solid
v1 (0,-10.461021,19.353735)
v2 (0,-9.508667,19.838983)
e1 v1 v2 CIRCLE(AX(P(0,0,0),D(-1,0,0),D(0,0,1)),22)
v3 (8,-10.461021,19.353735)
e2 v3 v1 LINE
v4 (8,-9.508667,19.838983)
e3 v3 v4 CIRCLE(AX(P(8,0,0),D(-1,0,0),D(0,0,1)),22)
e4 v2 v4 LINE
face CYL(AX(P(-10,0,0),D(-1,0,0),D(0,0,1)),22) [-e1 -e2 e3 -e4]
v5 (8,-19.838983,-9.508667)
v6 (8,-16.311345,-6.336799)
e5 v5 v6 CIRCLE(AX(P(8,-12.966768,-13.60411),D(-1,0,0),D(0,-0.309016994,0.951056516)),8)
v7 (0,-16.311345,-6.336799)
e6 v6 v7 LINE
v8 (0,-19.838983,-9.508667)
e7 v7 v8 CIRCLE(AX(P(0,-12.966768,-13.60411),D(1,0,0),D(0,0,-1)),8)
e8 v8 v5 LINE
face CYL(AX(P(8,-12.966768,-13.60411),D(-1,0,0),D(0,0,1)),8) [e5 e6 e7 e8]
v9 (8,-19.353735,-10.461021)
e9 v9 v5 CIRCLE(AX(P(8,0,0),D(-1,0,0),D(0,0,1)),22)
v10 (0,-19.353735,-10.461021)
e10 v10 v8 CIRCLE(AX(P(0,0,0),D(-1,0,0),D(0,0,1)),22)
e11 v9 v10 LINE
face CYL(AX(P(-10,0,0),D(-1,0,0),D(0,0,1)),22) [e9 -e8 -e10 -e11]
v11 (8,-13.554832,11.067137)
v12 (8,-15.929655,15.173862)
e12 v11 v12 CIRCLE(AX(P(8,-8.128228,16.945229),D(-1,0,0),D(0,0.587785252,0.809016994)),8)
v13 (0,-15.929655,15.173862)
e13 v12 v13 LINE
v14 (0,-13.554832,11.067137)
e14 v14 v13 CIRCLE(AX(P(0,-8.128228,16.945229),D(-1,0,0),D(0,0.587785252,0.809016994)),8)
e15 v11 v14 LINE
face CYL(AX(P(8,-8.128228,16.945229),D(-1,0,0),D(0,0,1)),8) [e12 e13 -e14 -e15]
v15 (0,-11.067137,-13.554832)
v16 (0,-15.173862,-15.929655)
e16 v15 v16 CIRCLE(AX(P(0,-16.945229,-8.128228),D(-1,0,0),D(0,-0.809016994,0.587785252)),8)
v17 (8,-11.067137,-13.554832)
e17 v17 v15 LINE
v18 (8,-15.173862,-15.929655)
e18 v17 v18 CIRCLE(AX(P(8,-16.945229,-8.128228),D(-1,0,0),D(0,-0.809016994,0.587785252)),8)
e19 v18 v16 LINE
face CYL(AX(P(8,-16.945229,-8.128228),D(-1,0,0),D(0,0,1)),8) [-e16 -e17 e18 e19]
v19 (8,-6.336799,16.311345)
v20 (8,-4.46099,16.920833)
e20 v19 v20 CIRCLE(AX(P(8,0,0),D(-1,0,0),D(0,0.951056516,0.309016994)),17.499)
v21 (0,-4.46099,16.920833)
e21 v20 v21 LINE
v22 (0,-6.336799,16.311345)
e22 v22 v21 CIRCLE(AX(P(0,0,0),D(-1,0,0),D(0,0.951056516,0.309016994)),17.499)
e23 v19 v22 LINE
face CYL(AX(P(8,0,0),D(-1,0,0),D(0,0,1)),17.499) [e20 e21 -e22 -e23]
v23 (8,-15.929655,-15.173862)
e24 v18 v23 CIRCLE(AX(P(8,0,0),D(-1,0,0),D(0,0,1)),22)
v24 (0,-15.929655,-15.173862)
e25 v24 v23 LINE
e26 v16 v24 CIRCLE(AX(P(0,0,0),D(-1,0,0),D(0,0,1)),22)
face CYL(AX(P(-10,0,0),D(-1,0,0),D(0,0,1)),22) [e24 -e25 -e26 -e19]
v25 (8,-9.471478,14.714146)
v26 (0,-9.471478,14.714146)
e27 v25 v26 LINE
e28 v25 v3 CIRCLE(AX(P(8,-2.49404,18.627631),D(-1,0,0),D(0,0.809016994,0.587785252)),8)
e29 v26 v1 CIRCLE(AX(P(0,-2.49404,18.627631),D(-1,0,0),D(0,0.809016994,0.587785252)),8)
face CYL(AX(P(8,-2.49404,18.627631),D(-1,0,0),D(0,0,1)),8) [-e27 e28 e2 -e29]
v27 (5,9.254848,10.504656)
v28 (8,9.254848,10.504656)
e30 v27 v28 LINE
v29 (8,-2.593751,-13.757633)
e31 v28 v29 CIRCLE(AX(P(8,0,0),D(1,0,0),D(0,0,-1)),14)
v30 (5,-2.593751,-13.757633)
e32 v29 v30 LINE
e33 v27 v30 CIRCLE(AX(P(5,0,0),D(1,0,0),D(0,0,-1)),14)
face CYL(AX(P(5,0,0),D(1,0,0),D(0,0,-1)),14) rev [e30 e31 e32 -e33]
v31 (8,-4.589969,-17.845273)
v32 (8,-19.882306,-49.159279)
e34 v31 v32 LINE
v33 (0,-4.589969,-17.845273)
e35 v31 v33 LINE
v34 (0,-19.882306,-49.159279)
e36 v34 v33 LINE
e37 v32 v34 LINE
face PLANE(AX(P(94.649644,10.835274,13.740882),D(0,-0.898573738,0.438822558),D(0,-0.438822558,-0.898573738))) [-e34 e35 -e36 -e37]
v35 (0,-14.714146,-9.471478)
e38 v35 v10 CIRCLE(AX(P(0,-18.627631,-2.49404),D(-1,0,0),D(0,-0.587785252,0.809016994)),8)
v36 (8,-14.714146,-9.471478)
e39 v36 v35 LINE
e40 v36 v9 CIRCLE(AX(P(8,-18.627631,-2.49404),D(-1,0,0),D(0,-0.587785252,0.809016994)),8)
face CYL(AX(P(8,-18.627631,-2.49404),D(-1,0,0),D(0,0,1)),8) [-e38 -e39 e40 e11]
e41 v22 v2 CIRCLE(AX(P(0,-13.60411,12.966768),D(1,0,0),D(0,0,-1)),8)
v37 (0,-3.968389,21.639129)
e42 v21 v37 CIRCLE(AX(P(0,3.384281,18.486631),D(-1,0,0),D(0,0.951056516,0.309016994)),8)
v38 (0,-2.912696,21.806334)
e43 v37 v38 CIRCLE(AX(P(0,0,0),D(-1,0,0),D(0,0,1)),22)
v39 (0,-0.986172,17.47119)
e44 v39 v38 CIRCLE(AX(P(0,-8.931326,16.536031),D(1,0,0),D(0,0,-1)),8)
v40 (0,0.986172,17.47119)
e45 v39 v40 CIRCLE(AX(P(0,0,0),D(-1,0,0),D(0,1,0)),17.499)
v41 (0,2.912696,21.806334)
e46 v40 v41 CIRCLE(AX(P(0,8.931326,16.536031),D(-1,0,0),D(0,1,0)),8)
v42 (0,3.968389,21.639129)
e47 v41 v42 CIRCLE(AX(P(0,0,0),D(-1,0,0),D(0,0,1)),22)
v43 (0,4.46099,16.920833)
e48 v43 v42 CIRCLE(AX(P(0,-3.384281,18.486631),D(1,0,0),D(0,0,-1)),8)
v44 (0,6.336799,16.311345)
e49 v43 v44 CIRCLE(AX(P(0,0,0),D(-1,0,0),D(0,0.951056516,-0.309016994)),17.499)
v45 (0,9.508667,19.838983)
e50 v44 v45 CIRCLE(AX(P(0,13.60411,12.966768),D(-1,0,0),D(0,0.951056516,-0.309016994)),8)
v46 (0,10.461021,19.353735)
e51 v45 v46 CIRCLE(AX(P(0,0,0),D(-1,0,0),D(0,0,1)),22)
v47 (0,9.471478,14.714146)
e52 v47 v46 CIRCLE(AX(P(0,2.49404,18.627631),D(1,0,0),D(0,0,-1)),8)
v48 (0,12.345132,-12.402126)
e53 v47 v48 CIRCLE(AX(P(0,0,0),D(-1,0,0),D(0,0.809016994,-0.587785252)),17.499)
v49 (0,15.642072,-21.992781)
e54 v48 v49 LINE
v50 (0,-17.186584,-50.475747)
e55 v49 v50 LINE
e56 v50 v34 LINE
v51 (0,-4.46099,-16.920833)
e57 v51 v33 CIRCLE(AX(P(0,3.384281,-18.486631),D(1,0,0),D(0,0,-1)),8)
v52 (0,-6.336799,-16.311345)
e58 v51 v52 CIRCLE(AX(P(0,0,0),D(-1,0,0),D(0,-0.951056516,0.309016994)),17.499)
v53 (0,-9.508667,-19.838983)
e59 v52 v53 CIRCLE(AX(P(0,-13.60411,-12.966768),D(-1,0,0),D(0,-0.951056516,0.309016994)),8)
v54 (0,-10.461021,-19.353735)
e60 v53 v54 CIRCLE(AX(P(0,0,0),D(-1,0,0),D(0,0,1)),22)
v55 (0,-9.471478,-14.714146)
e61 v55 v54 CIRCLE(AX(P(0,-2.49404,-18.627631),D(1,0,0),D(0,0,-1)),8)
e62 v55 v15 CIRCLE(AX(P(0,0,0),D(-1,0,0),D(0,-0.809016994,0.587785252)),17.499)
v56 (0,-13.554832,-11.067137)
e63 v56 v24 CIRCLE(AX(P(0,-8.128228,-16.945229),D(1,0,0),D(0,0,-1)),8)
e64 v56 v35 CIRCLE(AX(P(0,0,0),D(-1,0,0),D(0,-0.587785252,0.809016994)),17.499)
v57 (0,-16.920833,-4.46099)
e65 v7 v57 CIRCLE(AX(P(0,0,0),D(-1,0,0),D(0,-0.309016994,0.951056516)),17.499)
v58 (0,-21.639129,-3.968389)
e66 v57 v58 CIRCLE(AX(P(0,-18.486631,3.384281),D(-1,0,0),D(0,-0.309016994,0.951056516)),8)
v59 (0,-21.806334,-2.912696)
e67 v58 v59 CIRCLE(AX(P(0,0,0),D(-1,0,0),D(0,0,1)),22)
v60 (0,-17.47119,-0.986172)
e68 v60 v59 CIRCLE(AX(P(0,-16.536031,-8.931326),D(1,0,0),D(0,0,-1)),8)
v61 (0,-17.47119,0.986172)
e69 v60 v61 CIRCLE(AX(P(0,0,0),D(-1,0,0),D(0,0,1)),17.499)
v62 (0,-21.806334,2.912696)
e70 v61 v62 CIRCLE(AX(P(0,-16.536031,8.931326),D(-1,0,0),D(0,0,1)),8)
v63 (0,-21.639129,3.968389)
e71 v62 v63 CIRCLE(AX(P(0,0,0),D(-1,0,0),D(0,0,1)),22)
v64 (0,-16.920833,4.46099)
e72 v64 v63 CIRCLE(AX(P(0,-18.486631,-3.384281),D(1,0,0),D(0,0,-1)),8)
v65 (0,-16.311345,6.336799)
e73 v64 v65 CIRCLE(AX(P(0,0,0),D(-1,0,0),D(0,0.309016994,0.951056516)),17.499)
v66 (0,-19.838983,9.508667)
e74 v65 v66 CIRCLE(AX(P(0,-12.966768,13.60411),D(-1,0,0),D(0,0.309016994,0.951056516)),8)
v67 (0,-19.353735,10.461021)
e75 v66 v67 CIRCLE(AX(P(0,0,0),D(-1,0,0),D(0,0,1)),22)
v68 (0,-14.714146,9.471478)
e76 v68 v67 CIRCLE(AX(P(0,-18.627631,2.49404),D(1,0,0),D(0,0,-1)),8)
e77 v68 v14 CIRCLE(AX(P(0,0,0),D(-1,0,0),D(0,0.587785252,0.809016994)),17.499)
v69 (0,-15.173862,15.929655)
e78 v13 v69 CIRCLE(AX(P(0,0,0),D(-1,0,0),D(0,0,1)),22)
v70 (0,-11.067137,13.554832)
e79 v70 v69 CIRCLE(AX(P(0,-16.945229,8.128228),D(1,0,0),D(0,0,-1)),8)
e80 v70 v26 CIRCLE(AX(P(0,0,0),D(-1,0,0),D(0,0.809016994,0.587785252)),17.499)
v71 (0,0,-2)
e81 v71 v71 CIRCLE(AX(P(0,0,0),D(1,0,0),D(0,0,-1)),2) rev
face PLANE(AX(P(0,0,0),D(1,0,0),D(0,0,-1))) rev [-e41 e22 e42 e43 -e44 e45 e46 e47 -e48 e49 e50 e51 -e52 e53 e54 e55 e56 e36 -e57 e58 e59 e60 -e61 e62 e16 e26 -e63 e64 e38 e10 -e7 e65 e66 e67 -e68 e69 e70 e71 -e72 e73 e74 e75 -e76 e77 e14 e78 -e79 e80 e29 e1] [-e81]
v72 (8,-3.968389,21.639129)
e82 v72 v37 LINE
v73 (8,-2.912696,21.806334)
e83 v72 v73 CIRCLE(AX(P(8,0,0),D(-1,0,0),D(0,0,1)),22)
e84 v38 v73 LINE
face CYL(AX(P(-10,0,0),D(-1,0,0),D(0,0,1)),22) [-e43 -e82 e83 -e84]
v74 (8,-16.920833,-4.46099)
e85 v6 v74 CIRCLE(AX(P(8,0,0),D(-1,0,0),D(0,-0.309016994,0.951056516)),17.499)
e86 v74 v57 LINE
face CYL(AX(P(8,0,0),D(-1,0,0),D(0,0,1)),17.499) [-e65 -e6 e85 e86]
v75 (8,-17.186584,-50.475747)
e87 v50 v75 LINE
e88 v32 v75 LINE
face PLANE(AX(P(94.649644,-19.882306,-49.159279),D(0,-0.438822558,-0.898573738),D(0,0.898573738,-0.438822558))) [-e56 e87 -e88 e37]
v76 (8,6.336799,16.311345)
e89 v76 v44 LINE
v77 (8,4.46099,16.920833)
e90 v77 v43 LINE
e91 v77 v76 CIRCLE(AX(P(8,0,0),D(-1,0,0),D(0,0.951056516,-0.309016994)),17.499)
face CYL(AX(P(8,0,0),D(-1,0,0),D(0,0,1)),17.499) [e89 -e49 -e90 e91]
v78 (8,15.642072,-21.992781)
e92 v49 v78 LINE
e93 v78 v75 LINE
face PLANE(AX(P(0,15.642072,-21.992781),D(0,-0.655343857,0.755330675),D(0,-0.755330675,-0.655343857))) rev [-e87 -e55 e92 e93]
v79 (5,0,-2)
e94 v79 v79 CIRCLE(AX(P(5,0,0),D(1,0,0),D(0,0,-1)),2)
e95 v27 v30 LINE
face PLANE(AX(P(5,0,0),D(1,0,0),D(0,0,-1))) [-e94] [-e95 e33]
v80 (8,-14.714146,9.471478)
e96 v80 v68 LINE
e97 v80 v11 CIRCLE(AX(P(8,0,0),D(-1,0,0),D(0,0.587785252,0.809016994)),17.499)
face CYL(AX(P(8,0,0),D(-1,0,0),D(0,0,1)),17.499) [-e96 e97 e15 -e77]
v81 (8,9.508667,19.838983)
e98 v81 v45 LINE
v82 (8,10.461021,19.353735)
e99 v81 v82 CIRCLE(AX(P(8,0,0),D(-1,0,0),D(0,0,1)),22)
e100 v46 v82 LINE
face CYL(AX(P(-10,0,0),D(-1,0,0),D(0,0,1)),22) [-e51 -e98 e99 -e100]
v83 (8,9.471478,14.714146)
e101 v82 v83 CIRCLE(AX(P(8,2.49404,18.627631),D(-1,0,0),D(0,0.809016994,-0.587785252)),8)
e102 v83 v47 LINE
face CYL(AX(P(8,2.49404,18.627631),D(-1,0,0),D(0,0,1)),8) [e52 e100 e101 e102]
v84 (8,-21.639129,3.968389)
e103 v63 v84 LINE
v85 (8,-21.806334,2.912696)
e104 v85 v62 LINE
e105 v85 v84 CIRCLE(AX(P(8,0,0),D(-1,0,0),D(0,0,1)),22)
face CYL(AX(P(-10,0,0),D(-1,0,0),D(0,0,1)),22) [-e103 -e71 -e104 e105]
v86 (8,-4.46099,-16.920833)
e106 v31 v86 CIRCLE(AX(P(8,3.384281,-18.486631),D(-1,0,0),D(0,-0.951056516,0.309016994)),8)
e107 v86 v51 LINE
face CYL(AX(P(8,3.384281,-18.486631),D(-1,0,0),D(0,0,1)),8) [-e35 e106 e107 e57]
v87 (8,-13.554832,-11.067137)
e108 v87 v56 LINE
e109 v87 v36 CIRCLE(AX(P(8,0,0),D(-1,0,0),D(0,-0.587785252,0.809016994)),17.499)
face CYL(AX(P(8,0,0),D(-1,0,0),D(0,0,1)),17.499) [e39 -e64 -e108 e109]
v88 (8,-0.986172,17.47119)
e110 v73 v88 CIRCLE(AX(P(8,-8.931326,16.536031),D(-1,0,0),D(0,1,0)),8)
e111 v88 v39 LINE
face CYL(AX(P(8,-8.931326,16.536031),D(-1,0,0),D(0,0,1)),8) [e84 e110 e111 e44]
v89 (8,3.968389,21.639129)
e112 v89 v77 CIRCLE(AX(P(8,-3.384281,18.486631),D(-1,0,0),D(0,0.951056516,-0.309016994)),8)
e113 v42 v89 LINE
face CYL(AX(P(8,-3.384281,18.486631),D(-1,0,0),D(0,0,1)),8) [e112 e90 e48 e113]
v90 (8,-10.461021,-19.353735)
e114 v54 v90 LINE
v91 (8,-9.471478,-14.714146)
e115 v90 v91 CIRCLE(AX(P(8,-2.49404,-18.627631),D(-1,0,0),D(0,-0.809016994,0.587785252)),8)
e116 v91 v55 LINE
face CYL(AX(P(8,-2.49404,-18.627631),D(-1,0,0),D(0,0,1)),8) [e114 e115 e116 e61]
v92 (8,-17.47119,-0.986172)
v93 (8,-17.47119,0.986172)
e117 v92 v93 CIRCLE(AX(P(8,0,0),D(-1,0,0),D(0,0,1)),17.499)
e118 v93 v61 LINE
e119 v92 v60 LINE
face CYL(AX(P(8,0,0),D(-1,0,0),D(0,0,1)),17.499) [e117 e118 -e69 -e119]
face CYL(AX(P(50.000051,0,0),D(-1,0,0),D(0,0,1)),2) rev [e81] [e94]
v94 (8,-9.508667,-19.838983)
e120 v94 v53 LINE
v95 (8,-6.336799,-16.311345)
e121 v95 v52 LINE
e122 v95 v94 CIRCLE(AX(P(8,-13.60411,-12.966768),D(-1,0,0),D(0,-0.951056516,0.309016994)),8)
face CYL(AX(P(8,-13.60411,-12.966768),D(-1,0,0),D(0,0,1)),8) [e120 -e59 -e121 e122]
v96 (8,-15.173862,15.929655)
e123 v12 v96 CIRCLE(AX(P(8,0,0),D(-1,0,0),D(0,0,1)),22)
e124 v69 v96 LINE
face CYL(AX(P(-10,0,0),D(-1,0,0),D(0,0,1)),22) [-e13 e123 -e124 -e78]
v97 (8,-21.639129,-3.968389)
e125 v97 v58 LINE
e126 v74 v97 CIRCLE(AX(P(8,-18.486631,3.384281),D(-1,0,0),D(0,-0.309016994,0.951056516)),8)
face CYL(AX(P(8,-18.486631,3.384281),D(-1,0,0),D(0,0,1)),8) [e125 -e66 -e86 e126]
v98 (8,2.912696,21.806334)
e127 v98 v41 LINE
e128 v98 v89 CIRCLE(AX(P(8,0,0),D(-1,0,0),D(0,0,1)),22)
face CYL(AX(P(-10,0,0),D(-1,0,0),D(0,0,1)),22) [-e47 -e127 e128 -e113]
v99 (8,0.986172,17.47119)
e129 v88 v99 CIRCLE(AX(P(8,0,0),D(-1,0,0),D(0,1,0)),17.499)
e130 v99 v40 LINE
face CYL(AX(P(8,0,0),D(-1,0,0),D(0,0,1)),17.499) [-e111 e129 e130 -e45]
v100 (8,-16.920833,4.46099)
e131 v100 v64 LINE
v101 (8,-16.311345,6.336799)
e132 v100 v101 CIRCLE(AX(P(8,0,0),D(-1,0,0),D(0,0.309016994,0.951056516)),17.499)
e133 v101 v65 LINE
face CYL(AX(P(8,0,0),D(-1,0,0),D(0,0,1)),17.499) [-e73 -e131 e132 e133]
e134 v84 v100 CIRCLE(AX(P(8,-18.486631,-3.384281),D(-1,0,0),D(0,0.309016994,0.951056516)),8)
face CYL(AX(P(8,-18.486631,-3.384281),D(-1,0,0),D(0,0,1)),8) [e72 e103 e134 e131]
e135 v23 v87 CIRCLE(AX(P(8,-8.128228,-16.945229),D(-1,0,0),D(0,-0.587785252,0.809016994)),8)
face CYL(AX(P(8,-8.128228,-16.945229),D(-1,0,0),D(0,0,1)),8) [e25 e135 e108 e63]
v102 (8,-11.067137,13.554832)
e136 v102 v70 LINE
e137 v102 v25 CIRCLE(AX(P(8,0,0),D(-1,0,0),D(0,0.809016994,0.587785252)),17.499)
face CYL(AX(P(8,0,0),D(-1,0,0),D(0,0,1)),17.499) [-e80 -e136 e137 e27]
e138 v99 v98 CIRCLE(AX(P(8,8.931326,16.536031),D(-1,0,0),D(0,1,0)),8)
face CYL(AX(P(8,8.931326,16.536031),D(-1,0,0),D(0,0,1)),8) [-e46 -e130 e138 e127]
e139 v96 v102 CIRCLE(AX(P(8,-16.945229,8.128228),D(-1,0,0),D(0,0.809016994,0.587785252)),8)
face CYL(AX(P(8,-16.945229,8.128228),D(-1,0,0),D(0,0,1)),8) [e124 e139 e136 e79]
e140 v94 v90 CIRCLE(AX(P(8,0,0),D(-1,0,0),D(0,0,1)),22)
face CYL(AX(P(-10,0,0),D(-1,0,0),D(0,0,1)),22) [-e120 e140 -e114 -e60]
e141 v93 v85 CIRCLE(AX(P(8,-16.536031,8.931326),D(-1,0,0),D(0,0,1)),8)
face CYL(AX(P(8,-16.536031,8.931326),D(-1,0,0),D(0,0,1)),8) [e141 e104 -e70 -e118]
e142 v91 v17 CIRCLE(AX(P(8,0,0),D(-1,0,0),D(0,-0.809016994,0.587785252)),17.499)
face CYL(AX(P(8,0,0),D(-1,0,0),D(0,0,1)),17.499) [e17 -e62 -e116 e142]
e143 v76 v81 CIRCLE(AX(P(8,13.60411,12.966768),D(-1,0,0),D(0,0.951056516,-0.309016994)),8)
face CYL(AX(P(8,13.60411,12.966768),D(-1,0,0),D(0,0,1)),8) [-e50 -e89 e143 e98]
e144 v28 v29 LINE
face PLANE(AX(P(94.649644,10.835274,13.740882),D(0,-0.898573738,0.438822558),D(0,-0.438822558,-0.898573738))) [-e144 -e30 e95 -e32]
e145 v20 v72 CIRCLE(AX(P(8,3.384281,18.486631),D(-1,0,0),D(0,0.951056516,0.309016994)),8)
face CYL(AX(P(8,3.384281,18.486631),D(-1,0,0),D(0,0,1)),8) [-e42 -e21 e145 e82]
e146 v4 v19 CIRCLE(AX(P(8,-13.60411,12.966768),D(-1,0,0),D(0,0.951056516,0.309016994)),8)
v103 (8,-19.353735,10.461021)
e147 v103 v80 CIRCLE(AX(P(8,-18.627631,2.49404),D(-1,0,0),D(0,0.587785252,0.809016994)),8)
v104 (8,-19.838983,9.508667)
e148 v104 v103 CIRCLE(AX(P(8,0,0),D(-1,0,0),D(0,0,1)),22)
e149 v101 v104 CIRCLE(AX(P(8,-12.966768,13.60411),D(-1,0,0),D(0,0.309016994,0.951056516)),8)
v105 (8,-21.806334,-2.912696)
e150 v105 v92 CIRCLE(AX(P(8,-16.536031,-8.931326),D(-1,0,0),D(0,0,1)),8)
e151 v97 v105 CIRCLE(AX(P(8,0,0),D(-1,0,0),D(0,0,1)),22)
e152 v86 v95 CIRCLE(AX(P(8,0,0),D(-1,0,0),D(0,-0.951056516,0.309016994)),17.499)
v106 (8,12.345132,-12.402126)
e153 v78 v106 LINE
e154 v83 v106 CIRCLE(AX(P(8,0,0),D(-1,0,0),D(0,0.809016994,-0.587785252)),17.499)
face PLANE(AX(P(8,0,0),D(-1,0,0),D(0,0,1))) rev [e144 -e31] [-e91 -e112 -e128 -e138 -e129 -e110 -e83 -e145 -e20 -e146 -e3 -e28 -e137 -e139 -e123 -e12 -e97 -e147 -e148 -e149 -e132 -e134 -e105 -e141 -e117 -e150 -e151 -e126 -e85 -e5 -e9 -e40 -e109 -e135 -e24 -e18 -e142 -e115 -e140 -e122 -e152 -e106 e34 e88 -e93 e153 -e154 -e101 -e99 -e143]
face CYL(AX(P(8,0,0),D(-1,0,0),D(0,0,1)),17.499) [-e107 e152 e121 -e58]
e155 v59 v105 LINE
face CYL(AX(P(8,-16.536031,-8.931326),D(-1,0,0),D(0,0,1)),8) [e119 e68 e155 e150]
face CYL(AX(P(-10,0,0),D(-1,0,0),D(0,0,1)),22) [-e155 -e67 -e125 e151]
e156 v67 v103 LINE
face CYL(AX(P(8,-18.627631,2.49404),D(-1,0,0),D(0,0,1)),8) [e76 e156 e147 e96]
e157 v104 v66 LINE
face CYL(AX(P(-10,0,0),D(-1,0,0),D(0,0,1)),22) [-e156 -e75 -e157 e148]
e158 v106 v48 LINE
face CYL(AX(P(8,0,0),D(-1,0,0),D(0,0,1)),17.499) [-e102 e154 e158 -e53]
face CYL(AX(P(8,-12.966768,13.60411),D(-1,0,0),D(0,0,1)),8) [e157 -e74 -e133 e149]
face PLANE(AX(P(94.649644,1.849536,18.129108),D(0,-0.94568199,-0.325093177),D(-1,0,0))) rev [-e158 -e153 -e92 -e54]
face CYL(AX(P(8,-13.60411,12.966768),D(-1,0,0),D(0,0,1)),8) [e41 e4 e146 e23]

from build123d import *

# Parameters (mm, degrees)
BASPROSKE_W         = 8
BASPROSKE_H         = 22
TOOTHCUT_DEPTH      = 33.124756808
TEETHCUTS_COUNT     = 20
TEETHCUTS_ANGLE     = 342
BORSKE_R            = 2
BORE_DEPTH          = 8
SKETCH1_R           = 14
CUT_EXTRUDE1_DEPTH  = 3
CUT_EXTRUDE2_DEPTH  = 32.859573128
BOSS_EXTRUDE1_DEPTH = 8
CUT_EXTRUDE3_DEPTH  = 66.194920127
CHAMFER1_SIZE       = 30


with BuildPart() as part:
    # BasProSke → Base-Revolve (revolve)
    with BuildSketch(Plane(origin=(0, 0, 0), x_dir=(1, 0, 0), z_dir=(0, 1, 0)), mode=Mode.PRIVATE) as base_revolve_sk:
        with Locations((4, 11)):
            Rectangle(BASPROSKE_W, BASPROSKE_H)
    revolve(base_revolve_sk.sketch.rotate(Axis((-10, 0, 0), (1, 0, 0)), 180), axis=Axis((-10, 0, 0), (1, 0, 0)))

    # TooCutSke → ToothCut (cut, through all)
    with BuildSketch(Plane(origin=(0, 0, 0), x_dir=(0, 0, -1), z_dir=(1, 0, 0))):
        with BuildLine():
            ThreePointArc((0.986171591, 17.471189616), (0, 17.499), (-0.986171591, 17.471189616))
            ThreePointArc((-0.986171591, 17.471189616), (-1.626916196, 19.798789858), (-2.932850173, 21.829260982))
            ThreePointArc((-2.932850173, 21.829260982), (0, 22.0254), (2.932850173, 21.829260982))
            ThreePointArc((2.932850173, 21.829260982), (1.626916196, 19.798789858), (0.986171591, 17.471189616))
        make_face()
    toothcut = extrude(amount=TOOTHCUT_DEPTH, mode=Mode.SUBTRACT)

    # TeethCuts: ToothCut ×20 about axis
    teethcuts_axis = Axis((-10, 0, 0), (1, 0, 0))
    for i in range(1, TEETHCUTS_COUNT):
        add(toothcut.rotate(teethcuts_axis, i * TEETHCUTS_ANGLE / (TEETHCUTS_COUNT - 1)), mode=Mode.SUBTRACT)

    # BorSke → Bore (cut, symmetric)
    with BuildSketch(Plane(origin=(0, 0, 0), x_dir=(0, 0, -1), z_dir=(1, 0, 0))):
        with Locations(Location((0, 0, 0), (0, 0, 180))):
            Circle(BORSKE_R)
    extrude(amount=BORE_DEPTH, both=True, mode=Mode.SUBTRACT)

    # Sketch1 → Cut-Extrude1 (cut)
    with BuildSketch(Plane(origin=(8, 0, 0), x_dir=(0, 0, -1), z_dir=(1, 0, 0))):
        Circle(SKETCH1_R)
    extrude(amount=-CUT_EXTRUDE1_DEPTH, mode=Mode.SUBTRACT)

    # Sketch2 → Cut-Extrude2 (cut, through all)
    with BuildSketch(Plane.ZY):
        Polygon((-21.592193025, -6.419793995), (20.580067201, 14.175220465), (12.820897061, 30.063616315), (-23.756341743, 14.175220465), (-26.106914947, 1.214231969), align=None)
    extrude(amount=-CUT_EXTRUDE2_DEPTH, mode=Mode.SUBTRACT)

    # Sketch3 → Boss-Extrude1 (add)
    with BuildSketch(Plane.ZY):
        Polygon((13.740882365, 10.835273546), (-49.159279282, -19.882305538), (-57.935730449, -1.910830782), (4.964431198, 28.806748303), align=None)
    extrude(amount=-BOSS_EXTRUDE1_DEPTH)

    # Sketch6 → Cut-Extrude3 (cut, through all)
    with BuildSketch(Plane(origin=(8, 0, 0), x_dir=(0, 0, -1), z_dir=(1, 0, 0))):
        Polygon((50.475746957, -17.186584325), (57.935730449, -1.910830782), (21.992780936, 15.642071552), align=None)
    extrude(amount=-CUT_EXTRUDE3_DEPTH, mode=Mode.SUBTRACT)

    # Chamfer1
    # the kernel refuses this chamfer: 30 mm, written as the material it takes off along each edge
    with BuildSketch(Plane(origin=(-77.150489639, 28.806748303, 4.964431198), x_dir=(0, -0.4139495743409253, -0.9102998131950631), z_dir=(1, 0, 0))) as chamfer1_piece_1_section:
        Polygon((CHAMFER1_SIZE * 0.999621916911, -CHAMFER1_SIZE * 0.0274958766106), (-CHAMFER1_SIZE * 0.0274958766106, -CHAMFER1_SIZE * 0.999621916911), (0, 0), align=None)
    chamfer1_piece_1 = extrude(amount=162.300979278, mode=Mode.PRIVATE)
    chamfer1_piece_1 = chamfer1_piece_1 - Plane(origin=(2.5, 0, 0), x_dir=(0, 0.632443978109164, 0.7746061028377297), z_dir=(-1, 0, 0)) * Cylinder(17.499, 445, mode=Mode.PRIVATE)
    chamfer1_piece_1 = split(chamfer1_piece_1, bisect_by=Plane(origin=(2.5, 5.973711679, 3.785897747), z_dir=(0, 0.898573737810962, -0.43882255834954154)), keep=Keep.TOP, mode=Mode.PRIVATE)
    add(chamfer1_piece_1, mode=Mode.SUBTRACT)


solid = part.part
